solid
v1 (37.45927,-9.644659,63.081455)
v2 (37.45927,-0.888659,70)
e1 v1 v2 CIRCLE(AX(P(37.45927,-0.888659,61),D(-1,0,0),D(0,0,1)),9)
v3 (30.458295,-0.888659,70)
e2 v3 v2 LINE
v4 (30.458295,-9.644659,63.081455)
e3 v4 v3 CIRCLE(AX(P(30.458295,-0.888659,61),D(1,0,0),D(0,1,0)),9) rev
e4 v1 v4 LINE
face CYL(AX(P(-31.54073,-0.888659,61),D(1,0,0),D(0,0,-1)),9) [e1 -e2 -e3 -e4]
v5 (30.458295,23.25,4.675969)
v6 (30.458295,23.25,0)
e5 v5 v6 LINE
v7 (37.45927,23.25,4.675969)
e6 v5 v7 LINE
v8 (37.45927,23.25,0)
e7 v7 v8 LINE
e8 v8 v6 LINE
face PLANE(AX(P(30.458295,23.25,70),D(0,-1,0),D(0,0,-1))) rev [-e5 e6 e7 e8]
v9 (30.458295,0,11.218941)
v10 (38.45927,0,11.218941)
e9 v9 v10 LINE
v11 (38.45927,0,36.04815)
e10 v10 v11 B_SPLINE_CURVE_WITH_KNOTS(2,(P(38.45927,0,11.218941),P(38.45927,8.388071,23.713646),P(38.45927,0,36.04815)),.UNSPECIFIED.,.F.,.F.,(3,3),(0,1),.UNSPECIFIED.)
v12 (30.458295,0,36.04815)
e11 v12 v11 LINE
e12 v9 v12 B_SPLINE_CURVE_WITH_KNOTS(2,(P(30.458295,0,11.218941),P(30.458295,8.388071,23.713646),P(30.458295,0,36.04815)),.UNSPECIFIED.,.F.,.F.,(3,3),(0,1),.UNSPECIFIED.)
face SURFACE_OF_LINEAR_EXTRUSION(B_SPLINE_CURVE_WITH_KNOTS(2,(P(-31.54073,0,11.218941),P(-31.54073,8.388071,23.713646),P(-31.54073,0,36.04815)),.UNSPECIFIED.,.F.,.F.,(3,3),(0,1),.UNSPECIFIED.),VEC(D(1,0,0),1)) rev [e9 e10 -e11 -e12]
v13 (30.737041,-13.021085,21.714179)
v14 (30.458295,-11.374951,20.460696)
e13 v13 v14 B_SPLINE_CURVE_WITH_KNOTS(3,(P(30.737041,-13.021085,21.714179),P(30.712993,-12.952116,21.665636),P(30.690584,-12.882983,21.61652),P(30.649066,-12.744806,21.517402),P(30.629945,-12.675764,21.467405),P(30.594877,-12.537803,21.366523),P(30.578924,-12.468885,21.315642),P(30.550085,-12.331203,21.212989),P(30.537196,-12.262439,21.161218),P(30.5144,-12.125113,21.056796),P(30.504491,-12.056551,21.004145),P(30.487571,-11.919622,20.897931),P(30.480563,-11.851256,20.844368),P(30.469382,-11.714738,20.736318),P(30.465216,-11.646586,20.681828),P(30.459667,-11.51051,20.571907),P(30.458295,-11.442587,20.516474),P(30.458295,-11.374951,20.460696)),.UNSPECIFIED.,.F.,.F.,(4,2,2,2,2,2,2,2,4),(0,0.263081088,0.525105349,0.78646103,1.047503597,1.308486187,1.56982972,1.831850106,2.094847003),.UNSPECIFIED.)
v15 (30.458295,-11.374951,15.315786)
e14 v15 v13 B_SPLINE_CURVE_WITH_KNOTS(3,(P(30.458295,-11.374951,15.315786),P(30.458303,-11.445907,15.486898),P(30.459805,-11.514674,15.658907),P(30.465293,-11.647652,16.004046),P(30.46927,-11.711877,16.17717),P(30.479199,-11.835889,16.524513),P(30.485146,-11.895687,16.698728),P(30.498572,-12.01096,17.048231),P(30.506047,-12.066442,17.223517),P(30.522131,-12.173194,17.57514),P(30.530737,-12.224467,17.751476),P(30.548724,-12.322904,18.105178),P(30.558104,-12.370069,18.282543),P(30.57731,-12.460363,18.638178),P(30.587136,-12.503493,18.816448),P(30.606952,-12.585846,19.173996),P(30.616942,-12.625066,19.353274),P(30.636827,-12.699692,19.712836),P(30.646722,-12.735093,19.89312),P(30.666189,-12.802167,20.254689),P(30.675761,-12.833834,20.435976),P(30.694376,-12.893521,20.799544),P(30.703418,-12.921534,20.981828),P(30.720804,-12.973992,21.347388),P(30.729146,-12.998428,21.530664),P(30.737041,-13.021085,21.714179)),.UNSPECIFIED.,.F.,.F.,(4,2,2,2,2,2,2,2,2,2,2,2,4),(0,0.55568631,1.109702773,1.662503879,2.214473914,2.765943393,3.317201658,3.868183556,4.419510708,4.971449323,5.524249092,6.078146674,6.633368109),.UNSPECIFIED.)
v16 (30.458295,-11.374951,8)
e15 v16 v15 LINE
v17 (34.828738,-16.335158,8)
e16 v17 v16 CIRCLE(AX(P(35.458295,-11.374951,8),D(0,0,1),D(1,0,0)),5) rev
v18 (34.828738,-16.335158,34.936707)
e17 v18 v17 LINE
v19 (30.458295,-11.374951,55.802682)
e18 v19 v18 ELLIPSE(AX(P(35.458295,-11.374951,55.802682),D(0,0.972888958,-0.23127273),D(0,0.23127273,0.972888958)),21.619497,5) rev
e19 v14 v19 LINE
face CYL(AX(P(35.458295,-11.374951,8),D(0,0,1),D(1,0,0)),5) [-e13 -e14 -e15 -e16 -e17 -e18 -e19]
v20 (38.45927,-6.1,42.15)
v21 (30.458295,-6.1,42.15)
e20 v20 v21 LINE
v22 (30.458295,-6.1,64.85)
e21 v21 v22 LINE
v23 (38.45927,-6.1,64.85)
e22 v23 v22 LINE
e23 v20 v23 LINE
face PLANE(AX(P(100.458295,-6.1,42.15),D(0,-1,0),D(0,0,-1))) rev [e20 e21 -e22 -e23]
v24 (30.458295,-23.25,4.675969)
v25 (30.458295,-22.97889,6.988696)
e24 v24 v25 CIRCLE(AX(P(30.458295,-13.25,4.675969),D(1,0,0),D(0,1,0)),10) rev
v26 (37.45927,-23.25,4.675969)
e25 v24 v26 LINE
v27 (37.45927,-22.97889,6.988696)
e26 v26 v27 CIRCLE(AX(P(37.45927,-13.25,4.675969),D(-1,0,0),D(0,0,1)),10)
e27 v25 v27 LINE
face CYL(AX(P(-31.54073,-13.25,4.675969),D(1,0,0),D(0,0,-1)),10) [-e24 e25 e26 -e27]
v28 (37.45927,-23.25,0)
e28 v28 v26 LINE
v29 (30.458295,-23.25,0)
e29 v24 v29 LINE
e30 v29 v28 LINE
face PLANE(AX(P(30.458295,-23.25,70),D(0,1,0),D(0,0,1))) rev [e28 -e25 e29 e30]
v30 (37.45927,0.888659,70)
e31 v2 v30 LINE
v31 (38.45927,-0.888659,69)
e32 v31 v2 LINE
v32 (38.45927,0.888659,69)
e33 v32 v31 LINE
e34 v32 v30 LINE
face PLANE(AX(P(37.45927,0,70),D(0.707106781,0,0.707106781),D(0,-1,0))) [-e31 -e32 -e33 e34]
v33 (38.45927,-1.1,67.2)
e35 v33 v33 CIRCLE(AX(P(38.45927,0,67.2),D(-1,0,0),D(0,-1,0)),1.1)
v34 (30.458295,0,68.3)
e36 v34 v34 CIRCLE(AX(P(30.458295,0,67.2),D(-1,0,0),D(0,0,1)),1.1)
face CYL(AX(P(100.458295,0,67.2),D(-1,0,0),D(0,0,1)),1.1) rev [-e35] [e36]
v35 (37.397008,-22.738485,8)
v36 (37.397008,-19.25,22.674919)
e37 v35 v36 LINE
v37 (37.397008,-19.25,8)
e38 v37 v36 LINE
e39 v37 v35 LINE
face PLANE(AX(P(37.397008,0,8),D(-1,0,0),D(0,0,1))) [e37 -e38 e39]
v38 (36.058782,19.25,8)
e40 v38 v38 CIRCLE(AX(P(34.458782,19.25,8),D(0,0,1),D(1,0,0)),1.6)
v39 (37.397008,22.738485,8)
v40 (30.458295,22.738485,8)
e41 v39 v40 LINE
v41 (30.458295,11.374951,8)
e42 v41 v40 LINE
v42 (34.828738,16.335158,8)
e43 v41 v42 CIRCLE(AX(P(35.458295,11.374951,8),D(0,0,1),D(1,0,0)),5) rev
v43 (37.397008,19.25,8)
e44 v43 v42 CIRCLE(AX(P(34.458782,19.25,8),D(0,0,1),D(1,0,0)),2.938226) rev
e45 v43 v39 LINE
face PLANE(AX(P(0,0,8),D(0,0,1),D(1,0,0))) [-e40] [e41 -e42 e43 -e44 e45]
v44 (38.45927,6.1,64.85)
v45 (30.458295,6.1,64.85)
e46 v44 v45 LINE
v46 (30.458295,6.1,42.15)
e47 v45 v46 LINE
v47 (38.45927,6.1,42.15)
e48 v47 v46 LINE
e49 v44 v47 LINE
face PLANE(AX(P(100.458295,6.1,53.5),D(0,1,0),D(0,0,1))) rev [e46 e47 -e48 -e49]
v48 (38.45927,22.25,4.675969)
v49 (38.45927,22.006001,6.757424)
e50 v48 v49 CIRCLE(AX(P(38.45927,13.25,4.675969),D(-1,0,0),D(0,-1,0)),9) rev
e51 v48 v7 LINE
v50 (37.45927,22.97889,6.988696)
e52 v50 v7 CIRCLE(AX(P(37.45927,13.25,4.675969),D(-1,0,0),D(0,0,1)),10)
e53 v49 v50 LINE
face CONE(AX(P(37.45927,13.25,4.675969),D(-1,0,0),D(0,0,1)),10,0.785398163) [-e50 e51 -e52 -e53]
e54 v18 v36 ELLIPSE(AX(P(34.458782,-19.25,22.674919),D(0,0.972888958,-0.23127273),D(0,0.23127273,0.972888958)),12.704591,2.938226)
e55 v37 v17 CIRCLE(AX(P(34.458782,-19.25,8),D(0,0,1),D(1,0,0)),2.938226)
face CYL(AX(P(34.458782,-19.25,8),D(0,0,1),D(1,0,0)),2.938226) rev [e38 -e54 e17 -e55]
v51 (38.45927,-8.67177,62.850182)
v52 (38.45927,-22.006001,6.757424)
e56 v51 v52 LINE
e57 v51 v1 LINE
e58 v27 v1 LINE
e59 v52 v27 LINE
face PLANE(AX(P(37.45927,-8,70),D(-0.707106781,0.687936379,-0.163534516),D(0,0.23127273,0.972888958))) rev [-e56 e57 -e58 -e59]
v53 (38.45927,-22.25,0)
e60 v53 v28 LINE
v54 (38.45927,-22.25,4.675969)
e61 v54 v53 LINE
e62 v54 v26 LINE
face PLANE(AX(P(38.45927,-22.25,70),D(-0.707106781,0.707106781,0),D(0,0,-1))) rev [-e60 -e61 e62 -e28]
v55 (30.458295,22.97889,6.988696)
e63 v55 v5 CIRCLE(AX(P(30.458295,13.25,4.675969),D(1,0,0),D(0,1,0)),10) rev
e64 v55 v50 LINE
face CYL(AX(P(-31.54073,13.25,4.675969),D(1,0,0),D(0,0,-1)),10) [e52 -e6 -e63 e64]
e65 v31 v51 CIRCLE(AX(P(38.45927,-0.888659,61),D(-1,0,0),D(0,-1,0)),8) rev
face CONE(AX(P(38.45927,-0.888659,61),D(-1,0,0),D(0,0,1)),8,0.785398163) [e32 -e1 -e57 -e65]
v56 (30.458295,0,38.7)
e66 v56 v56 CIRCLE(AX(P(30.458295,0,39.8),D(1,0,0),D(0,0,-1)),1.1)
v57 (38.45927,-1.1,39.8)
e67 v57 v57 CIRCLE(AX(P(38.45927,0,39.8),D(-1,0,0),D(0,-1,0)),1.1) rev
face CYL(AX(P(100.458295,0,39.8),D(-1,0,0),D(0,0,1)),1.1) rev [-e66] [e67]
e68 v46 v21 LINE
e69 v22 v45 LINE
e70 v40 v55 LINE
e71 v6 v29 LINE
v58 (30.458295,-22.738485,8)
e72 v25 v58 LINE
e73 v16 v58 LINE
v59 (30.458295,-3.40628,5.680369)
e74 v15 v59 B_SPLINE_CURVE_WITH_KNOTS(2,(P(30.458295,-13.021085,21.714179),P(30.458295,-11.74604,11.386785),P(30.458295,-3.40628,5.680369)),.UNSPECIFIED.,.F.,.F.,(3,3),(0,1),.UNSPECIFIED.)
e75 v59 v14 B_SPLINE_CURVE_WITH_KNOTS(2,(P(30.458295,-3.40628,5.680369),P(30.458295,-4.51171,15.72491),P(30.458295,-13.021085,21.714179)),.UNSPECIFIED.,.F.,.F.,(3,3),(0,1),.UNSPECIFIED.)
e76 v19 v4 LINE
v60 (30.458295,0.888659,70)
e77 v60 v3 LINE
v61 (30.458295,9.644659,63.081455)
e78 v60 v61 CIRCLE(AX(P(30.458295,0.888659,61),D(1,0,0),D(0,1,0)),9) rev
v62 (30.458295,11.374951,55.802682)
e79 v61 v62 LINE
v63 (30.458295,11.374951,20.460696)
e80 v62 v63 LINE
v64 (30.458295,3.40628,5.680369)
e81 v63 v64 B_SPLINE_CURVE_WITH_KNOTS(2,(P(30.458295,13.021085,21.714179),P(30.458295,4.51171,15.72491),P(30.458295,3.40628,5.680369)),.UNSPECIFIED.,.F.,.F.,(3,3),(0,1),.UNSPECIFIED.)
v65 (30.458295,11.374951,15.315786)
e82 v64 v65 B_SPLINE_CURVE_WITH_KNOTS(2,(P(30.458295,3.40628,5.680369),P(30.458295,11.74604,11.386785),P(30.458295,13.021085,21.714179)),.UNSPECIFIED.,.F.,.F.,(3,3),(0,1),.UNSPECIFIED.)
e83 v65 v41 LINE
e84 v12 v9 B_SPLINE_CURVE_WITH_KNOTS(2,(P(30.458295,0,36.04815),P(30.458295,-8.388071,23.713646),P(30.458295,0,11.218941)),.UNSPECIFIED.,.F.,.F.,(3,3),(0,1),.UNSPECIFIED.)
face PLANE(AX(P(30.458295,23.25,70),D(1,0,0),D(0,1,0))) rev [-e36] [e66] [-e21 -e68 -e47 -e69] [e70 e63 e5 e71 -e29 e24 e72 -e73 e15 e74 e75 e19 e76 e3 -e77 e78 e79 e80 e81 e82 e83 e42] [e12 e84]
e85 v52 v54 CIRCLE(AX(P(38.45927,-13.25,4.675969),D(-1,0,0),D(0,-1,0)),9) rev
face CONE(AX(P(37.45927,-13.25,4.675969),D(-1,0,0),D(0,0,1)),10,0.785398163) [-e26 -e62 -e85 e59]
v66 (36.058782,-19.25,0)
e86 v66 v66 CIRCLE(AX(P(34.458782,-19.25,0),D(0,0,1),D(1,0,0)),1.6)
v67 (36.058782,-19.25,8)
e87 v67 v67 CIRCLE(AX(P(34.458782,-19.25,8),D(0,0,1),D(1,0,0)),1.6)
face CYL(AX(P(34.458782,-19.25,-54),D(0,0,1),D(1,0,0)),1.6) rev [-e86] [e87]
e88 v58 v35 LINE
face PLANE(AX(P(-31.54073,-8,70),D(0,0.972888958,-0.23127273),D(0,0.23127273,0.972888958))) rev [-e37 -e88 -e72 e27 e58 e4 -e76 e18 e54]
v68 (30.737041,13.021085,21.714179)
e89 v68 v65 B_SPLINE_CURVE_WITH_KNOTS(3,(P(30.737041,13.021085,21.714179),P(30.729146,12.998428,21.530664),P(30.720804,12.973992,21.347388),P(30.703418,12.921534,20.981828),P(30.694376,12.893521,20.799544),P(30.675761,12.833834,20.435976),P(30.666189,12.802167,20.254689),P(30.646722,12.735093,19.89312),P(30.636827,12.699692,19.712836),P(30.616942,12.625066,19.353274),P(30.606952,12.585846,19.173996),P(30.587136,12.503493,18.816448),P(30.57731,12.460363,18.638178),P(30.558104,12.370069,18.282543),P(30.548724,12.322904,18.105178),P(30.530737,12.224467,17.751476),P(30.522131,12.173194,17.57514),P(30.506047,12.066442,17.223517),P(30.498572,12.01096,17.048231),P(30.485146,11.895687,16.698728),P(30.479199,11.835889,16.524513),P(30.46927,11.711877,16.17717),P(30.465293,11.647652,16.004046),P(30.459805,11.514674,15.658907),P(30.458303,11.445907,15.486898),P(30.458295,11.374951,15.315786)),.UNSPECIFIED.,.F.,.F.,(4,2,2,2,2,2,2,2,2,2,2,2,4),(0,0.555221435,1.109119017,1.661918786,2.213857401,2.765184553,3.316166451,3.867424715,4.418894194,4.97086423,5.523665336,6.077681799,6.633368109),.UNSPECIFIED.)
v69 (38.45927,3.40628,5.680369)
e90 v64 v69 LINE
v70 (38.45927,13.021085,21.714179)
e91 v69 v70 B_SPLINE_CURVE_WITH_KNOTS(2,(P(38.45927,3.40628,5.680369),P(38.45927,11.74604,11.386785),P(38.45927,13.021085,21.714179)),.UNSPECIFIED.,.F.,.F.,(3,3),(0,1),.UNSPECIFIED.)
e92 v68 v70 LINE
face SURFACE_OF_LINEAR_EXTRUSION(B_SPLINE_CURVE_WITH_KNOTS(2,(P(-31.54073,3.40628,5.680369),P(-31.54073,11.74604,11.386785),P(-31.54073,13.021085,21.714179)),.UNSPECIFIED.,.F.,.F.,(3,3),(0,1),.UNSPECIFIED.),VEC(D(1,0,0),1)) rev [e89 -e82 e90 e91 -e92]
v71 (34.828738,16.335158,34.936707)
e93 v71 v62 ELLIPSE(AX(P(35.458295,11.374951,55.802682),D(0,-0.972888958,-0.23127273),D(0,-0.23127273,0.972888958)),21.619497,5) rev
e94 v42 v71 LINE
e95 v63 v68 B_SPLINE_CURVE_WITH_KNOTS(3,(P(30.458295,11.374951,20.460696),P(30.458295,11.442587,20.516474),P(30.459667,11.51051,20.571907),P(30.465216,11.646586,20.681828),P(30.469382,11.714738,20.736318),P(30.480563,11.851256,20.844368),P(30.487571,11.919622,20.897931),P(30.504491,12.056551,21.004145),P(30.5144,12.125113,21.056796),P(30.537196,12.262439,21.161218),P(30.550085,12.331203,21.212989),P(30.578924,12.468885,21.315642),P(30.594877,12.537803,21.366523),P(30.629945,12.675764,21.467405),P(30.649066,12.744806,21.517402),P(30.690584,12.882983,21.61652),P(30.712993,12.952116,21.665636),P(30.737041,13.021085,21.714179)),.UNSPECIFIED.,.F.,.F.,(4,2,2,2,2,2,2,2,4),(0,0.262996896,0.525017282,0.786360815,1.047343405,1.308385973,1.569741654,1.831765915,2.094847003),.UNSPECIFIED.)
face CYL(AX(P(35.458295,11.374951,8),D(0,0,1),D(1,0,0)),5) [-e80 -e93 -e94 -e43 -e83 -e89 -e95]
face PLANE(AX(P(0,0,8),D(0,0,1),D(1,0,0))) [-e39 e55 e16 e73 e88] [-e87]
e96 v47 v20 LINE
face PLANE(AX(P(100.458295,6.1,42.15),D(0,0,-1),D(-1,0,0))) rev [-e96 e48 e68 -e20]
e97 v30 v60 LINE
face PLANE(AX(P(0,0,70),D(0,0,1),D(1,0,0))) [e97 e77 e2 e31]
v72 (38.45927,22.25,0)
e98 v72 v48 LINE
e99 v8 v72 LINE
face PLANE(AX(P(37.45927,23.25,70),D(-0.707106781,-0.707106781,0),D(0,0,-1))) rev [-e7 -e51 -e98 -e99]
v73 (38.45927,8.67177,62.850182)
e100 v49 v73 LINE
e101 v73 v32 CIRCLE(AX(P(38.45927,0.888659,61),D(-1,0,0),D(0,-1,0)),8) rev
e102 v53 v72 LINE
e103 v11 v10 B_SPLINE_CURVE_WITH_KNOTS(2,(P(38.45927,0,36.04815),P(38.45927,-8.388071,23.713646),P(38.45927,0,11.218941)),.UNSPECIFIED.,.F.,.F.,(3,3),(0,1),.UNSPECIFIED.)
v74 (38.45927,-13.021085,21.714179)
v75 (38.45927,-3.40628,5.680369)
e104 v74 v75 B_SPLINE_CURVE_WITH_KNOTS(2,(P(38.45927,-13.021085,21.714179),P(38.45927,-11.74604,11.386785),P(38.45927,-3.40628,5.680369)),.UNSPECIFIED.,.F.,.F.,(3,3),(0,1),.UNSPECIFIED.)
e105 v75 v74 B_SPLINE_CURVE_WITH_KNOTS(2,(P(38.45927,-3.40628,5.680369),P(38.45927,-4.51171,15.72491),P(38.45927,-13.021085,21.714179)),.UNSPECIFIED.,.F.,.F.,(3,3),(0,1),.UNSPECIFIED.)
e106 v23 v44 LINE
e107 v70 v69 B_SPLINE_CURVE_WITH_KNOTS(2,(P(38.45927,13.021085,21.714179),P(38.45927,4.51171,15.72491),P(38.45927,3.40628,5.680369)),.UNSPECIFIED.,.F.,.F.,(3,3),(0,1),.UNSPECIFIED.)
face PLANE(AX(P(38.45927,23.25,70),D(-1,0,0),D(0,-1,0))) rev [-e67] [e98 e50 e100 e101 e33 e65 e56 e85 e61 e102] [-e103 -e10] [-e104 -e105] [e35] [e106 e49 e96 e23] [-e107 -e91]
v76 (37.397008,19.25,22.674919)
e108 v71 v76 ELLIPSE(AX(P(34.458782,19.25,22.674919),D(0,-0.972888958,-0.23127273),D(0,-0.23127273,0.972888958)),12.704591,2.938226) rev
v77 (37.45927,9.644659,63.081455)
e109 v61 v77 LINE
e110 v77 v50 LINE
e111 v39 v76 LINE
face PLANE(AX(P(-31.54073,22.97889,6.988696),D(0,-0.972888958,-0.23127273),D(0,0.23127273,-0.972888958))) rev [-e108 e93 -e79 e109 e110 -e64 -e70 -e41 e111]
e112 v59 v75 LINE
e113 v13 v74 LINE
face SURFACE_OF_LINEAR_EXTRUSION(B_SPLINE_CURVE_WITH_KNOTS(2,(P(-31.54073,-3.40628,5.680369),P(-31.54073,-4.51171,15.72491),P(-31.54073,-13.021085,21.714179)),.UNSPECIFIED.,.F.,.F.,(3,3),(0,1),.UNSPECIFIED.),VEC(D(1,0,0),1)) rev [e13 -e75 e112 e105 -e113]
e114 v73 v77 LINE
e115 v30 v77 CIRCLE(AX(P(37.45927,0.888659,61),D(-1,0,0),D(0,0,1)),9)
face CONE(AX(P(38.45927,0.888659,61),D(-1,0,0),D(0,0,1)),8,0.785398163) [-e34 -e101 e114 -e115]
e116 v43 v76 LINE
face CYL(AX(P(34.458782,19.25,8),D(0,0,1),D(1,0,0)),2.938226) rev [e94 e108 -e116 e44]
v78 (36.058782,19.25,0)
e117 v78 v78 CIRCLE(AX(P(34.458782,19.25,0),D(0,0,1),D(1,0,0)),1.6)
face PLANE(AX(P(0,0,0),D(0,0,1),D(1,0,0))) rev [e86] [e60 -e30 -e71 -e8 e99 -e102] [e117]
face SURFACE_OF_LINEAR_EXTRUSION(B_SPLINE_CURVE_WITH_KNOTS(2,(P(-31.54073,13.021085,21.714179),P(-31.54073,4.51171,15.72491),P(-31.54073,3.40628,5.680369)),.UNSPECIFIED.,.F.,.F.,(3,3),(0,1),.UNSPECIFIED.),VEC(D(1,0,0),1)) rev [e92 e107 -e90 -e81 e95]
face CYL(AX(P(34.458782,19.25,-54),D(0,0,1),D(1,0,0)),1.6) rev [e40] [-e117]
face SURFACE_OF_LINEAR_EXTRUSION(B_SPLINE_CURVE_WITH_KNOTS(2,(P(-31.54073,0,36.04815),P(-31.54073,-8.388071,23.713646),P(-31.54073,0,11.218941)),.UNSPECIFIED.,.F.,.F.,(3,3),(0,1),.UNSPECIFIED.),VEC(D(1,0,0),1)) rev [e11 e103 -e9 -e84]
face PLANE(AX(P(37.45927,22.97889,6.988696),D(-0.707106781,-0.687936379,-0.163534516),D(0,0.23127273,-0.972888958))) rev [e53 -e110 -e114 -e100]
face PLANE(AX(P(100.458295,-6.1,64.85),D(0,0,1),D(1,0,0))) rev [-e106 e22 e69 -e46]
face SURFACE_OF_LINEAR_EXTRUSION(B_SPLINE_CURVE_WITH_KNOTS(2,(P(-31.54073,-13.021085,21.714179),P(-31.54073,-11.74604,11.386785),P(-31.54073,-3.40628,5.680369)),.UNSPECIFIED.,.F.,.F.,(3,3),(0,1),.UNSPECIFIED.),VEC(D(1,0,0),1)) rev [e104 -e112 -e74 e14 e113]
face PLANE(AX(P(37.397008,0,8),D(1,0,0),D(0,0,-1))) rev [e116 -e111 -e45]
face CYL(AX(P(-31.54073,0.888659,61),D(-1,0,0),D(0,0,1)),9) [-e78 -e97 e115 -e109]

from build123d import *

# Parameters (mm, degrees)
SKETCH1_W           = 8.000974829
SKETCH1_H           = 46.5
BOSS_EXTRUDE1_DEPTH = 70
CUT_EXTRUDE1_DEPTH  = 70
SKETCH3_R           = 1.1
CUT_EXTRUDE2_DEPTH  = 70
FILLET1_R           = 9
CUT_EXTRUDE3_DEPTH  = 62
SKETCH5_R           = 1.6
CUT_EXTRUDE4_DEPTH  = 62
FILLET2_R           = 5
CHAMFER1_SIZE       = 1


with BuildPart() as part:
    # Sketch1 → Boss-Extrude1 (new body)
    with BuildSketch(Plane.XY):
        with Locations((34.458782271, 0)):
            Rectangle(SKETCH1_W, SKETCH1_H)
    extrude(amount=BOSS_EXTRUDE1_DEPTH)

    # Sketch2 → Cut-Extrude1 (cut)
    with BuildSketch(Plane(origin=(38.459269685, 0, 0), x_dir=(0, 0, -1), z_dir=(1, 0, 0))):
        with BuildLine():
            Line((0, -23.25), (-4.675968949, -23.25))
            ThreePointArc((-4.675968949, -23.25), (-5.84025075, -23.181991134), (-6.988696254, -22.978889578))
            Line((-6.988696254, -22.978889578), (-70, -8))
            Line((-70, -8), (-70, 0))
            Line((-70, 0), (-70, 8))
            Line((-70, 8), (-6.988696254, 22.978889578))
            ThreePointArc((-6.988696254, 22.978889578), (-5.84025075, 23.181991134), (-4.675968949, 23.25))
            Line((-4.675968949, 23.25), (0, 23.25))
            Line((0, 23.25), (0, 33.462731107))
            Line((0, 33.462731107), (-74.824697051, 33.462731107))
            Line((-74.824697051, 33.462731107), (-74.824697051, -41.354226456))
            Line((-74.824697051, -41.354226456), (0, -41.354226456))
            Line((0, -41.354226456), (0, -23.25))
        make_face()
        with BuildLine():
            add(Edge.make_bspline(
                [(-36.048150351, 0), (-23.713645553, -8.388071288), (-11.218940507, 0)],
                knots=[0, 0, 0, 1, 1, 1], degree=2))
            add(Edge.make_bspline(
                [(-36.048150351, 0), (-23.713645553, 8.388071288), (-11.218940507, 0)],
                knots=[0, 0, 0, 1, 1, 1], degree=2))
        make_face()
        with BuildLine():
            add(Edge.make_bspline(
                [(-5.680368735, 3.40627966), (-15.724909711, 4.511710031), (-21.714178832, 13.021085274)],
                knots=[0, 0, 0, 1, 1, 1], degree=2))
            add(Edge.make_bspline(
                [(-5.680368735, 3.40627966), (-11.386784663, 11.746039667), (-21.714178832, 13.021085274)],
                knots=[0, 0, 0, 1, 1, 1], degree=2))
        make_face()
        with BuildLine():
            add(Edge.make_bspline(
                [(-5.680368735, -3.40627966), (-15.724909711, -4.511710031), (-21.714178832, -13.021085274)],
                knots=[0, 0, 0, 1, 1, 1], degree=2))
            add(Edge.make_bspline(
                [(-5.680368735, -3.40627966), (-11.386784663, -11.746039667), (-21.714178832, -13.021085274)],
                knots=[0, 0, 0, 1, 1, 1], degree=2))
        make_face()
    extrude(amount=-CUT_EXTRUDE1_DEPTH, mode=Mode.SUBTRACT)

    # Sketch3 → Cut-Extrude2 (cut)
    with BuildSketch(Plane.ZY.offset(-30.458294856)):
        with Locations((67.2, 0)):
            Circle(SKETCH3_R)
        with Locations(Location((39.8, 0, 0), (0, 0, 270))):
            Circle(SKETCH3_R)
        Polygon((53.5, 6.1), (42.15, 6.1), (42.15, -6.1), (64.85, -6.1), (64.85, 6.1), align=None)
    extrude(amount=-CUT_EXTRUDE2_DEPTH, mode=Mode.SUBTRACT)

    # Fillet1
    fillet1_edges = [part.edges().sort_by_distance(p)[0] for p in [
        (34.458782271, -8, 70),
        (34.458782271, 8, 70),
    ]]
    fillet(fillet1_edges, radius=FILLET1_R)

    # Sketch4 → Cut-Extrude3 (cut)
    with BuildSketch(Plane.XY.offset(70)):
        with BuildLine():
            ThreePointArc((37.397007822, -19.25), (36.536421482, -17.172360788), (34.458782271, -16.311774449))
            Line((34.458782271, -16.311774449), (30.458294856, -16.311774449))
            Line((30.458294856, -16.311774449), (30.458294856, -22.188225551))
            Line((30.458294856, -22.188225551), (30.458294856, -24.738187672))
            Line((30.458294856, -24.738187672), (37.397007822, -23.25))
            Line((37.397007822, -23.25), (37.397007822, -19.25))
        make_face()
        with BuildLine():
            Line((30.458294856, 24.500594278), (30.458294856, 22.188225551))
            Line((30.458294856, 22.188225551), (30.458294856, 16.311774449))
            Line((30.458294856, 16.311774449), (34.458782271, 16.311774449))
            ThreePointArc((34.458782271, 16.311774449), (36.536421482, 17.172360788), (37.397007822, 19.25))
            Line((37.397007822, 19.25), (37.397007822, 23.25))
            Line((37.397007822, 23.25), (30.458294856, 24.500594278))
        make_face()
    extrude(amount=-CUT_EXTRUDE3_DEPTH, mode=Mode.SUBTRACT)

    # Sketch5 → Cut-Extrude4 (cut)
    with BuildSketch(Plane.XY.offset(8)):
        with Locations((34.458782271, 19.25)):
            Circle(SKETCH5_R)
        with Locations((34.458782271, -19.25)):
            Circle(SKETCH5_R)
    extrude(amount=-CUT_EXTRUDE4_DEPTH, mode=Mode.SUBTRACT)

    # Fillet2
    # the kernel refuses this fillet: 5 mm, written as the material it takes off along each edge
    with BuildSketch(Plane(origin=(30.458294856, -16.311774449, 56.016575811), x_dir=(0, 1, 0), z_dir=(0, 0, -1))) as fillet2_piece_1:
        with BuildLine():
            CenterArc((4.936823623, 5), FILLET2_R, 187.233387323, 82.766612677)
            Line((-0.023383871, 4.37044332), (-0.519404621, 4.307487652))
            ThreePointArc((-0.519404621, 4.307487652), (-0.5, 4.000487415), (-0.5, 0))
            Line((-0.5, 0), (0, -0.5))
            Line((0, -0.5), (4.936823623, -0.5))
            Line((4.936823623, -0.5), (4.936823623, 0))
        make_face()
    extrude(amount=48.016575811, mode=Mode.SUBTRACT)
    with BuildSketch(Plane(origin=(30.458294856, 16.311774449, 56.016575811), x_dir=(0, -1, 0), z_dir=(0, 0, -1))) as fillet2_piece_2:
        with BuildLine():
            CenterArc((4.936823623, -5), FILLET2_R, 90, 82.766612677)
            Line((-0.023383871, -4.37044332), (-0.519404621, -4.307487652))
            ThreePointArc((-0.519404621, -4.307487652), (-0.5, -4.000487415), (-0.5, 0))
            Line((-0.5, 0), (0, 0.5))
            Line((0, 0.5), (4.936823623, 0.5))
            Line((4.936823623, 0.5), (4.936823623, 0))
        make_face()
    extrude(amount=48.016575811, mode=Mode.SUBTRACT)

    # Chamfer1
    chamfer1_edges = [part.edges().sort_by_distance(p)[0] for p in [
        (38.459269685, 16.311774449, 35.035075414),
        (38.459269685, 0, 70),
        (38.459269685, -6.468394753, 68.061624854),
        (38.459269685, 6.468394753, 68.061624854),
        (38.459269685, 23.25, 2.337984474),
        (38.459269685, -23.25, 2.337984474),
        (38.459269685, -23.181991134, 5.84025075),
        (38.459269685, -16.311774449, 35.035075414),
        (38.459269685, 23.181991134, 5.84025075),
    ]]
    chamfer(chamfer1_edges, length=CHAMFER1_SIZE)


solid = part.part
